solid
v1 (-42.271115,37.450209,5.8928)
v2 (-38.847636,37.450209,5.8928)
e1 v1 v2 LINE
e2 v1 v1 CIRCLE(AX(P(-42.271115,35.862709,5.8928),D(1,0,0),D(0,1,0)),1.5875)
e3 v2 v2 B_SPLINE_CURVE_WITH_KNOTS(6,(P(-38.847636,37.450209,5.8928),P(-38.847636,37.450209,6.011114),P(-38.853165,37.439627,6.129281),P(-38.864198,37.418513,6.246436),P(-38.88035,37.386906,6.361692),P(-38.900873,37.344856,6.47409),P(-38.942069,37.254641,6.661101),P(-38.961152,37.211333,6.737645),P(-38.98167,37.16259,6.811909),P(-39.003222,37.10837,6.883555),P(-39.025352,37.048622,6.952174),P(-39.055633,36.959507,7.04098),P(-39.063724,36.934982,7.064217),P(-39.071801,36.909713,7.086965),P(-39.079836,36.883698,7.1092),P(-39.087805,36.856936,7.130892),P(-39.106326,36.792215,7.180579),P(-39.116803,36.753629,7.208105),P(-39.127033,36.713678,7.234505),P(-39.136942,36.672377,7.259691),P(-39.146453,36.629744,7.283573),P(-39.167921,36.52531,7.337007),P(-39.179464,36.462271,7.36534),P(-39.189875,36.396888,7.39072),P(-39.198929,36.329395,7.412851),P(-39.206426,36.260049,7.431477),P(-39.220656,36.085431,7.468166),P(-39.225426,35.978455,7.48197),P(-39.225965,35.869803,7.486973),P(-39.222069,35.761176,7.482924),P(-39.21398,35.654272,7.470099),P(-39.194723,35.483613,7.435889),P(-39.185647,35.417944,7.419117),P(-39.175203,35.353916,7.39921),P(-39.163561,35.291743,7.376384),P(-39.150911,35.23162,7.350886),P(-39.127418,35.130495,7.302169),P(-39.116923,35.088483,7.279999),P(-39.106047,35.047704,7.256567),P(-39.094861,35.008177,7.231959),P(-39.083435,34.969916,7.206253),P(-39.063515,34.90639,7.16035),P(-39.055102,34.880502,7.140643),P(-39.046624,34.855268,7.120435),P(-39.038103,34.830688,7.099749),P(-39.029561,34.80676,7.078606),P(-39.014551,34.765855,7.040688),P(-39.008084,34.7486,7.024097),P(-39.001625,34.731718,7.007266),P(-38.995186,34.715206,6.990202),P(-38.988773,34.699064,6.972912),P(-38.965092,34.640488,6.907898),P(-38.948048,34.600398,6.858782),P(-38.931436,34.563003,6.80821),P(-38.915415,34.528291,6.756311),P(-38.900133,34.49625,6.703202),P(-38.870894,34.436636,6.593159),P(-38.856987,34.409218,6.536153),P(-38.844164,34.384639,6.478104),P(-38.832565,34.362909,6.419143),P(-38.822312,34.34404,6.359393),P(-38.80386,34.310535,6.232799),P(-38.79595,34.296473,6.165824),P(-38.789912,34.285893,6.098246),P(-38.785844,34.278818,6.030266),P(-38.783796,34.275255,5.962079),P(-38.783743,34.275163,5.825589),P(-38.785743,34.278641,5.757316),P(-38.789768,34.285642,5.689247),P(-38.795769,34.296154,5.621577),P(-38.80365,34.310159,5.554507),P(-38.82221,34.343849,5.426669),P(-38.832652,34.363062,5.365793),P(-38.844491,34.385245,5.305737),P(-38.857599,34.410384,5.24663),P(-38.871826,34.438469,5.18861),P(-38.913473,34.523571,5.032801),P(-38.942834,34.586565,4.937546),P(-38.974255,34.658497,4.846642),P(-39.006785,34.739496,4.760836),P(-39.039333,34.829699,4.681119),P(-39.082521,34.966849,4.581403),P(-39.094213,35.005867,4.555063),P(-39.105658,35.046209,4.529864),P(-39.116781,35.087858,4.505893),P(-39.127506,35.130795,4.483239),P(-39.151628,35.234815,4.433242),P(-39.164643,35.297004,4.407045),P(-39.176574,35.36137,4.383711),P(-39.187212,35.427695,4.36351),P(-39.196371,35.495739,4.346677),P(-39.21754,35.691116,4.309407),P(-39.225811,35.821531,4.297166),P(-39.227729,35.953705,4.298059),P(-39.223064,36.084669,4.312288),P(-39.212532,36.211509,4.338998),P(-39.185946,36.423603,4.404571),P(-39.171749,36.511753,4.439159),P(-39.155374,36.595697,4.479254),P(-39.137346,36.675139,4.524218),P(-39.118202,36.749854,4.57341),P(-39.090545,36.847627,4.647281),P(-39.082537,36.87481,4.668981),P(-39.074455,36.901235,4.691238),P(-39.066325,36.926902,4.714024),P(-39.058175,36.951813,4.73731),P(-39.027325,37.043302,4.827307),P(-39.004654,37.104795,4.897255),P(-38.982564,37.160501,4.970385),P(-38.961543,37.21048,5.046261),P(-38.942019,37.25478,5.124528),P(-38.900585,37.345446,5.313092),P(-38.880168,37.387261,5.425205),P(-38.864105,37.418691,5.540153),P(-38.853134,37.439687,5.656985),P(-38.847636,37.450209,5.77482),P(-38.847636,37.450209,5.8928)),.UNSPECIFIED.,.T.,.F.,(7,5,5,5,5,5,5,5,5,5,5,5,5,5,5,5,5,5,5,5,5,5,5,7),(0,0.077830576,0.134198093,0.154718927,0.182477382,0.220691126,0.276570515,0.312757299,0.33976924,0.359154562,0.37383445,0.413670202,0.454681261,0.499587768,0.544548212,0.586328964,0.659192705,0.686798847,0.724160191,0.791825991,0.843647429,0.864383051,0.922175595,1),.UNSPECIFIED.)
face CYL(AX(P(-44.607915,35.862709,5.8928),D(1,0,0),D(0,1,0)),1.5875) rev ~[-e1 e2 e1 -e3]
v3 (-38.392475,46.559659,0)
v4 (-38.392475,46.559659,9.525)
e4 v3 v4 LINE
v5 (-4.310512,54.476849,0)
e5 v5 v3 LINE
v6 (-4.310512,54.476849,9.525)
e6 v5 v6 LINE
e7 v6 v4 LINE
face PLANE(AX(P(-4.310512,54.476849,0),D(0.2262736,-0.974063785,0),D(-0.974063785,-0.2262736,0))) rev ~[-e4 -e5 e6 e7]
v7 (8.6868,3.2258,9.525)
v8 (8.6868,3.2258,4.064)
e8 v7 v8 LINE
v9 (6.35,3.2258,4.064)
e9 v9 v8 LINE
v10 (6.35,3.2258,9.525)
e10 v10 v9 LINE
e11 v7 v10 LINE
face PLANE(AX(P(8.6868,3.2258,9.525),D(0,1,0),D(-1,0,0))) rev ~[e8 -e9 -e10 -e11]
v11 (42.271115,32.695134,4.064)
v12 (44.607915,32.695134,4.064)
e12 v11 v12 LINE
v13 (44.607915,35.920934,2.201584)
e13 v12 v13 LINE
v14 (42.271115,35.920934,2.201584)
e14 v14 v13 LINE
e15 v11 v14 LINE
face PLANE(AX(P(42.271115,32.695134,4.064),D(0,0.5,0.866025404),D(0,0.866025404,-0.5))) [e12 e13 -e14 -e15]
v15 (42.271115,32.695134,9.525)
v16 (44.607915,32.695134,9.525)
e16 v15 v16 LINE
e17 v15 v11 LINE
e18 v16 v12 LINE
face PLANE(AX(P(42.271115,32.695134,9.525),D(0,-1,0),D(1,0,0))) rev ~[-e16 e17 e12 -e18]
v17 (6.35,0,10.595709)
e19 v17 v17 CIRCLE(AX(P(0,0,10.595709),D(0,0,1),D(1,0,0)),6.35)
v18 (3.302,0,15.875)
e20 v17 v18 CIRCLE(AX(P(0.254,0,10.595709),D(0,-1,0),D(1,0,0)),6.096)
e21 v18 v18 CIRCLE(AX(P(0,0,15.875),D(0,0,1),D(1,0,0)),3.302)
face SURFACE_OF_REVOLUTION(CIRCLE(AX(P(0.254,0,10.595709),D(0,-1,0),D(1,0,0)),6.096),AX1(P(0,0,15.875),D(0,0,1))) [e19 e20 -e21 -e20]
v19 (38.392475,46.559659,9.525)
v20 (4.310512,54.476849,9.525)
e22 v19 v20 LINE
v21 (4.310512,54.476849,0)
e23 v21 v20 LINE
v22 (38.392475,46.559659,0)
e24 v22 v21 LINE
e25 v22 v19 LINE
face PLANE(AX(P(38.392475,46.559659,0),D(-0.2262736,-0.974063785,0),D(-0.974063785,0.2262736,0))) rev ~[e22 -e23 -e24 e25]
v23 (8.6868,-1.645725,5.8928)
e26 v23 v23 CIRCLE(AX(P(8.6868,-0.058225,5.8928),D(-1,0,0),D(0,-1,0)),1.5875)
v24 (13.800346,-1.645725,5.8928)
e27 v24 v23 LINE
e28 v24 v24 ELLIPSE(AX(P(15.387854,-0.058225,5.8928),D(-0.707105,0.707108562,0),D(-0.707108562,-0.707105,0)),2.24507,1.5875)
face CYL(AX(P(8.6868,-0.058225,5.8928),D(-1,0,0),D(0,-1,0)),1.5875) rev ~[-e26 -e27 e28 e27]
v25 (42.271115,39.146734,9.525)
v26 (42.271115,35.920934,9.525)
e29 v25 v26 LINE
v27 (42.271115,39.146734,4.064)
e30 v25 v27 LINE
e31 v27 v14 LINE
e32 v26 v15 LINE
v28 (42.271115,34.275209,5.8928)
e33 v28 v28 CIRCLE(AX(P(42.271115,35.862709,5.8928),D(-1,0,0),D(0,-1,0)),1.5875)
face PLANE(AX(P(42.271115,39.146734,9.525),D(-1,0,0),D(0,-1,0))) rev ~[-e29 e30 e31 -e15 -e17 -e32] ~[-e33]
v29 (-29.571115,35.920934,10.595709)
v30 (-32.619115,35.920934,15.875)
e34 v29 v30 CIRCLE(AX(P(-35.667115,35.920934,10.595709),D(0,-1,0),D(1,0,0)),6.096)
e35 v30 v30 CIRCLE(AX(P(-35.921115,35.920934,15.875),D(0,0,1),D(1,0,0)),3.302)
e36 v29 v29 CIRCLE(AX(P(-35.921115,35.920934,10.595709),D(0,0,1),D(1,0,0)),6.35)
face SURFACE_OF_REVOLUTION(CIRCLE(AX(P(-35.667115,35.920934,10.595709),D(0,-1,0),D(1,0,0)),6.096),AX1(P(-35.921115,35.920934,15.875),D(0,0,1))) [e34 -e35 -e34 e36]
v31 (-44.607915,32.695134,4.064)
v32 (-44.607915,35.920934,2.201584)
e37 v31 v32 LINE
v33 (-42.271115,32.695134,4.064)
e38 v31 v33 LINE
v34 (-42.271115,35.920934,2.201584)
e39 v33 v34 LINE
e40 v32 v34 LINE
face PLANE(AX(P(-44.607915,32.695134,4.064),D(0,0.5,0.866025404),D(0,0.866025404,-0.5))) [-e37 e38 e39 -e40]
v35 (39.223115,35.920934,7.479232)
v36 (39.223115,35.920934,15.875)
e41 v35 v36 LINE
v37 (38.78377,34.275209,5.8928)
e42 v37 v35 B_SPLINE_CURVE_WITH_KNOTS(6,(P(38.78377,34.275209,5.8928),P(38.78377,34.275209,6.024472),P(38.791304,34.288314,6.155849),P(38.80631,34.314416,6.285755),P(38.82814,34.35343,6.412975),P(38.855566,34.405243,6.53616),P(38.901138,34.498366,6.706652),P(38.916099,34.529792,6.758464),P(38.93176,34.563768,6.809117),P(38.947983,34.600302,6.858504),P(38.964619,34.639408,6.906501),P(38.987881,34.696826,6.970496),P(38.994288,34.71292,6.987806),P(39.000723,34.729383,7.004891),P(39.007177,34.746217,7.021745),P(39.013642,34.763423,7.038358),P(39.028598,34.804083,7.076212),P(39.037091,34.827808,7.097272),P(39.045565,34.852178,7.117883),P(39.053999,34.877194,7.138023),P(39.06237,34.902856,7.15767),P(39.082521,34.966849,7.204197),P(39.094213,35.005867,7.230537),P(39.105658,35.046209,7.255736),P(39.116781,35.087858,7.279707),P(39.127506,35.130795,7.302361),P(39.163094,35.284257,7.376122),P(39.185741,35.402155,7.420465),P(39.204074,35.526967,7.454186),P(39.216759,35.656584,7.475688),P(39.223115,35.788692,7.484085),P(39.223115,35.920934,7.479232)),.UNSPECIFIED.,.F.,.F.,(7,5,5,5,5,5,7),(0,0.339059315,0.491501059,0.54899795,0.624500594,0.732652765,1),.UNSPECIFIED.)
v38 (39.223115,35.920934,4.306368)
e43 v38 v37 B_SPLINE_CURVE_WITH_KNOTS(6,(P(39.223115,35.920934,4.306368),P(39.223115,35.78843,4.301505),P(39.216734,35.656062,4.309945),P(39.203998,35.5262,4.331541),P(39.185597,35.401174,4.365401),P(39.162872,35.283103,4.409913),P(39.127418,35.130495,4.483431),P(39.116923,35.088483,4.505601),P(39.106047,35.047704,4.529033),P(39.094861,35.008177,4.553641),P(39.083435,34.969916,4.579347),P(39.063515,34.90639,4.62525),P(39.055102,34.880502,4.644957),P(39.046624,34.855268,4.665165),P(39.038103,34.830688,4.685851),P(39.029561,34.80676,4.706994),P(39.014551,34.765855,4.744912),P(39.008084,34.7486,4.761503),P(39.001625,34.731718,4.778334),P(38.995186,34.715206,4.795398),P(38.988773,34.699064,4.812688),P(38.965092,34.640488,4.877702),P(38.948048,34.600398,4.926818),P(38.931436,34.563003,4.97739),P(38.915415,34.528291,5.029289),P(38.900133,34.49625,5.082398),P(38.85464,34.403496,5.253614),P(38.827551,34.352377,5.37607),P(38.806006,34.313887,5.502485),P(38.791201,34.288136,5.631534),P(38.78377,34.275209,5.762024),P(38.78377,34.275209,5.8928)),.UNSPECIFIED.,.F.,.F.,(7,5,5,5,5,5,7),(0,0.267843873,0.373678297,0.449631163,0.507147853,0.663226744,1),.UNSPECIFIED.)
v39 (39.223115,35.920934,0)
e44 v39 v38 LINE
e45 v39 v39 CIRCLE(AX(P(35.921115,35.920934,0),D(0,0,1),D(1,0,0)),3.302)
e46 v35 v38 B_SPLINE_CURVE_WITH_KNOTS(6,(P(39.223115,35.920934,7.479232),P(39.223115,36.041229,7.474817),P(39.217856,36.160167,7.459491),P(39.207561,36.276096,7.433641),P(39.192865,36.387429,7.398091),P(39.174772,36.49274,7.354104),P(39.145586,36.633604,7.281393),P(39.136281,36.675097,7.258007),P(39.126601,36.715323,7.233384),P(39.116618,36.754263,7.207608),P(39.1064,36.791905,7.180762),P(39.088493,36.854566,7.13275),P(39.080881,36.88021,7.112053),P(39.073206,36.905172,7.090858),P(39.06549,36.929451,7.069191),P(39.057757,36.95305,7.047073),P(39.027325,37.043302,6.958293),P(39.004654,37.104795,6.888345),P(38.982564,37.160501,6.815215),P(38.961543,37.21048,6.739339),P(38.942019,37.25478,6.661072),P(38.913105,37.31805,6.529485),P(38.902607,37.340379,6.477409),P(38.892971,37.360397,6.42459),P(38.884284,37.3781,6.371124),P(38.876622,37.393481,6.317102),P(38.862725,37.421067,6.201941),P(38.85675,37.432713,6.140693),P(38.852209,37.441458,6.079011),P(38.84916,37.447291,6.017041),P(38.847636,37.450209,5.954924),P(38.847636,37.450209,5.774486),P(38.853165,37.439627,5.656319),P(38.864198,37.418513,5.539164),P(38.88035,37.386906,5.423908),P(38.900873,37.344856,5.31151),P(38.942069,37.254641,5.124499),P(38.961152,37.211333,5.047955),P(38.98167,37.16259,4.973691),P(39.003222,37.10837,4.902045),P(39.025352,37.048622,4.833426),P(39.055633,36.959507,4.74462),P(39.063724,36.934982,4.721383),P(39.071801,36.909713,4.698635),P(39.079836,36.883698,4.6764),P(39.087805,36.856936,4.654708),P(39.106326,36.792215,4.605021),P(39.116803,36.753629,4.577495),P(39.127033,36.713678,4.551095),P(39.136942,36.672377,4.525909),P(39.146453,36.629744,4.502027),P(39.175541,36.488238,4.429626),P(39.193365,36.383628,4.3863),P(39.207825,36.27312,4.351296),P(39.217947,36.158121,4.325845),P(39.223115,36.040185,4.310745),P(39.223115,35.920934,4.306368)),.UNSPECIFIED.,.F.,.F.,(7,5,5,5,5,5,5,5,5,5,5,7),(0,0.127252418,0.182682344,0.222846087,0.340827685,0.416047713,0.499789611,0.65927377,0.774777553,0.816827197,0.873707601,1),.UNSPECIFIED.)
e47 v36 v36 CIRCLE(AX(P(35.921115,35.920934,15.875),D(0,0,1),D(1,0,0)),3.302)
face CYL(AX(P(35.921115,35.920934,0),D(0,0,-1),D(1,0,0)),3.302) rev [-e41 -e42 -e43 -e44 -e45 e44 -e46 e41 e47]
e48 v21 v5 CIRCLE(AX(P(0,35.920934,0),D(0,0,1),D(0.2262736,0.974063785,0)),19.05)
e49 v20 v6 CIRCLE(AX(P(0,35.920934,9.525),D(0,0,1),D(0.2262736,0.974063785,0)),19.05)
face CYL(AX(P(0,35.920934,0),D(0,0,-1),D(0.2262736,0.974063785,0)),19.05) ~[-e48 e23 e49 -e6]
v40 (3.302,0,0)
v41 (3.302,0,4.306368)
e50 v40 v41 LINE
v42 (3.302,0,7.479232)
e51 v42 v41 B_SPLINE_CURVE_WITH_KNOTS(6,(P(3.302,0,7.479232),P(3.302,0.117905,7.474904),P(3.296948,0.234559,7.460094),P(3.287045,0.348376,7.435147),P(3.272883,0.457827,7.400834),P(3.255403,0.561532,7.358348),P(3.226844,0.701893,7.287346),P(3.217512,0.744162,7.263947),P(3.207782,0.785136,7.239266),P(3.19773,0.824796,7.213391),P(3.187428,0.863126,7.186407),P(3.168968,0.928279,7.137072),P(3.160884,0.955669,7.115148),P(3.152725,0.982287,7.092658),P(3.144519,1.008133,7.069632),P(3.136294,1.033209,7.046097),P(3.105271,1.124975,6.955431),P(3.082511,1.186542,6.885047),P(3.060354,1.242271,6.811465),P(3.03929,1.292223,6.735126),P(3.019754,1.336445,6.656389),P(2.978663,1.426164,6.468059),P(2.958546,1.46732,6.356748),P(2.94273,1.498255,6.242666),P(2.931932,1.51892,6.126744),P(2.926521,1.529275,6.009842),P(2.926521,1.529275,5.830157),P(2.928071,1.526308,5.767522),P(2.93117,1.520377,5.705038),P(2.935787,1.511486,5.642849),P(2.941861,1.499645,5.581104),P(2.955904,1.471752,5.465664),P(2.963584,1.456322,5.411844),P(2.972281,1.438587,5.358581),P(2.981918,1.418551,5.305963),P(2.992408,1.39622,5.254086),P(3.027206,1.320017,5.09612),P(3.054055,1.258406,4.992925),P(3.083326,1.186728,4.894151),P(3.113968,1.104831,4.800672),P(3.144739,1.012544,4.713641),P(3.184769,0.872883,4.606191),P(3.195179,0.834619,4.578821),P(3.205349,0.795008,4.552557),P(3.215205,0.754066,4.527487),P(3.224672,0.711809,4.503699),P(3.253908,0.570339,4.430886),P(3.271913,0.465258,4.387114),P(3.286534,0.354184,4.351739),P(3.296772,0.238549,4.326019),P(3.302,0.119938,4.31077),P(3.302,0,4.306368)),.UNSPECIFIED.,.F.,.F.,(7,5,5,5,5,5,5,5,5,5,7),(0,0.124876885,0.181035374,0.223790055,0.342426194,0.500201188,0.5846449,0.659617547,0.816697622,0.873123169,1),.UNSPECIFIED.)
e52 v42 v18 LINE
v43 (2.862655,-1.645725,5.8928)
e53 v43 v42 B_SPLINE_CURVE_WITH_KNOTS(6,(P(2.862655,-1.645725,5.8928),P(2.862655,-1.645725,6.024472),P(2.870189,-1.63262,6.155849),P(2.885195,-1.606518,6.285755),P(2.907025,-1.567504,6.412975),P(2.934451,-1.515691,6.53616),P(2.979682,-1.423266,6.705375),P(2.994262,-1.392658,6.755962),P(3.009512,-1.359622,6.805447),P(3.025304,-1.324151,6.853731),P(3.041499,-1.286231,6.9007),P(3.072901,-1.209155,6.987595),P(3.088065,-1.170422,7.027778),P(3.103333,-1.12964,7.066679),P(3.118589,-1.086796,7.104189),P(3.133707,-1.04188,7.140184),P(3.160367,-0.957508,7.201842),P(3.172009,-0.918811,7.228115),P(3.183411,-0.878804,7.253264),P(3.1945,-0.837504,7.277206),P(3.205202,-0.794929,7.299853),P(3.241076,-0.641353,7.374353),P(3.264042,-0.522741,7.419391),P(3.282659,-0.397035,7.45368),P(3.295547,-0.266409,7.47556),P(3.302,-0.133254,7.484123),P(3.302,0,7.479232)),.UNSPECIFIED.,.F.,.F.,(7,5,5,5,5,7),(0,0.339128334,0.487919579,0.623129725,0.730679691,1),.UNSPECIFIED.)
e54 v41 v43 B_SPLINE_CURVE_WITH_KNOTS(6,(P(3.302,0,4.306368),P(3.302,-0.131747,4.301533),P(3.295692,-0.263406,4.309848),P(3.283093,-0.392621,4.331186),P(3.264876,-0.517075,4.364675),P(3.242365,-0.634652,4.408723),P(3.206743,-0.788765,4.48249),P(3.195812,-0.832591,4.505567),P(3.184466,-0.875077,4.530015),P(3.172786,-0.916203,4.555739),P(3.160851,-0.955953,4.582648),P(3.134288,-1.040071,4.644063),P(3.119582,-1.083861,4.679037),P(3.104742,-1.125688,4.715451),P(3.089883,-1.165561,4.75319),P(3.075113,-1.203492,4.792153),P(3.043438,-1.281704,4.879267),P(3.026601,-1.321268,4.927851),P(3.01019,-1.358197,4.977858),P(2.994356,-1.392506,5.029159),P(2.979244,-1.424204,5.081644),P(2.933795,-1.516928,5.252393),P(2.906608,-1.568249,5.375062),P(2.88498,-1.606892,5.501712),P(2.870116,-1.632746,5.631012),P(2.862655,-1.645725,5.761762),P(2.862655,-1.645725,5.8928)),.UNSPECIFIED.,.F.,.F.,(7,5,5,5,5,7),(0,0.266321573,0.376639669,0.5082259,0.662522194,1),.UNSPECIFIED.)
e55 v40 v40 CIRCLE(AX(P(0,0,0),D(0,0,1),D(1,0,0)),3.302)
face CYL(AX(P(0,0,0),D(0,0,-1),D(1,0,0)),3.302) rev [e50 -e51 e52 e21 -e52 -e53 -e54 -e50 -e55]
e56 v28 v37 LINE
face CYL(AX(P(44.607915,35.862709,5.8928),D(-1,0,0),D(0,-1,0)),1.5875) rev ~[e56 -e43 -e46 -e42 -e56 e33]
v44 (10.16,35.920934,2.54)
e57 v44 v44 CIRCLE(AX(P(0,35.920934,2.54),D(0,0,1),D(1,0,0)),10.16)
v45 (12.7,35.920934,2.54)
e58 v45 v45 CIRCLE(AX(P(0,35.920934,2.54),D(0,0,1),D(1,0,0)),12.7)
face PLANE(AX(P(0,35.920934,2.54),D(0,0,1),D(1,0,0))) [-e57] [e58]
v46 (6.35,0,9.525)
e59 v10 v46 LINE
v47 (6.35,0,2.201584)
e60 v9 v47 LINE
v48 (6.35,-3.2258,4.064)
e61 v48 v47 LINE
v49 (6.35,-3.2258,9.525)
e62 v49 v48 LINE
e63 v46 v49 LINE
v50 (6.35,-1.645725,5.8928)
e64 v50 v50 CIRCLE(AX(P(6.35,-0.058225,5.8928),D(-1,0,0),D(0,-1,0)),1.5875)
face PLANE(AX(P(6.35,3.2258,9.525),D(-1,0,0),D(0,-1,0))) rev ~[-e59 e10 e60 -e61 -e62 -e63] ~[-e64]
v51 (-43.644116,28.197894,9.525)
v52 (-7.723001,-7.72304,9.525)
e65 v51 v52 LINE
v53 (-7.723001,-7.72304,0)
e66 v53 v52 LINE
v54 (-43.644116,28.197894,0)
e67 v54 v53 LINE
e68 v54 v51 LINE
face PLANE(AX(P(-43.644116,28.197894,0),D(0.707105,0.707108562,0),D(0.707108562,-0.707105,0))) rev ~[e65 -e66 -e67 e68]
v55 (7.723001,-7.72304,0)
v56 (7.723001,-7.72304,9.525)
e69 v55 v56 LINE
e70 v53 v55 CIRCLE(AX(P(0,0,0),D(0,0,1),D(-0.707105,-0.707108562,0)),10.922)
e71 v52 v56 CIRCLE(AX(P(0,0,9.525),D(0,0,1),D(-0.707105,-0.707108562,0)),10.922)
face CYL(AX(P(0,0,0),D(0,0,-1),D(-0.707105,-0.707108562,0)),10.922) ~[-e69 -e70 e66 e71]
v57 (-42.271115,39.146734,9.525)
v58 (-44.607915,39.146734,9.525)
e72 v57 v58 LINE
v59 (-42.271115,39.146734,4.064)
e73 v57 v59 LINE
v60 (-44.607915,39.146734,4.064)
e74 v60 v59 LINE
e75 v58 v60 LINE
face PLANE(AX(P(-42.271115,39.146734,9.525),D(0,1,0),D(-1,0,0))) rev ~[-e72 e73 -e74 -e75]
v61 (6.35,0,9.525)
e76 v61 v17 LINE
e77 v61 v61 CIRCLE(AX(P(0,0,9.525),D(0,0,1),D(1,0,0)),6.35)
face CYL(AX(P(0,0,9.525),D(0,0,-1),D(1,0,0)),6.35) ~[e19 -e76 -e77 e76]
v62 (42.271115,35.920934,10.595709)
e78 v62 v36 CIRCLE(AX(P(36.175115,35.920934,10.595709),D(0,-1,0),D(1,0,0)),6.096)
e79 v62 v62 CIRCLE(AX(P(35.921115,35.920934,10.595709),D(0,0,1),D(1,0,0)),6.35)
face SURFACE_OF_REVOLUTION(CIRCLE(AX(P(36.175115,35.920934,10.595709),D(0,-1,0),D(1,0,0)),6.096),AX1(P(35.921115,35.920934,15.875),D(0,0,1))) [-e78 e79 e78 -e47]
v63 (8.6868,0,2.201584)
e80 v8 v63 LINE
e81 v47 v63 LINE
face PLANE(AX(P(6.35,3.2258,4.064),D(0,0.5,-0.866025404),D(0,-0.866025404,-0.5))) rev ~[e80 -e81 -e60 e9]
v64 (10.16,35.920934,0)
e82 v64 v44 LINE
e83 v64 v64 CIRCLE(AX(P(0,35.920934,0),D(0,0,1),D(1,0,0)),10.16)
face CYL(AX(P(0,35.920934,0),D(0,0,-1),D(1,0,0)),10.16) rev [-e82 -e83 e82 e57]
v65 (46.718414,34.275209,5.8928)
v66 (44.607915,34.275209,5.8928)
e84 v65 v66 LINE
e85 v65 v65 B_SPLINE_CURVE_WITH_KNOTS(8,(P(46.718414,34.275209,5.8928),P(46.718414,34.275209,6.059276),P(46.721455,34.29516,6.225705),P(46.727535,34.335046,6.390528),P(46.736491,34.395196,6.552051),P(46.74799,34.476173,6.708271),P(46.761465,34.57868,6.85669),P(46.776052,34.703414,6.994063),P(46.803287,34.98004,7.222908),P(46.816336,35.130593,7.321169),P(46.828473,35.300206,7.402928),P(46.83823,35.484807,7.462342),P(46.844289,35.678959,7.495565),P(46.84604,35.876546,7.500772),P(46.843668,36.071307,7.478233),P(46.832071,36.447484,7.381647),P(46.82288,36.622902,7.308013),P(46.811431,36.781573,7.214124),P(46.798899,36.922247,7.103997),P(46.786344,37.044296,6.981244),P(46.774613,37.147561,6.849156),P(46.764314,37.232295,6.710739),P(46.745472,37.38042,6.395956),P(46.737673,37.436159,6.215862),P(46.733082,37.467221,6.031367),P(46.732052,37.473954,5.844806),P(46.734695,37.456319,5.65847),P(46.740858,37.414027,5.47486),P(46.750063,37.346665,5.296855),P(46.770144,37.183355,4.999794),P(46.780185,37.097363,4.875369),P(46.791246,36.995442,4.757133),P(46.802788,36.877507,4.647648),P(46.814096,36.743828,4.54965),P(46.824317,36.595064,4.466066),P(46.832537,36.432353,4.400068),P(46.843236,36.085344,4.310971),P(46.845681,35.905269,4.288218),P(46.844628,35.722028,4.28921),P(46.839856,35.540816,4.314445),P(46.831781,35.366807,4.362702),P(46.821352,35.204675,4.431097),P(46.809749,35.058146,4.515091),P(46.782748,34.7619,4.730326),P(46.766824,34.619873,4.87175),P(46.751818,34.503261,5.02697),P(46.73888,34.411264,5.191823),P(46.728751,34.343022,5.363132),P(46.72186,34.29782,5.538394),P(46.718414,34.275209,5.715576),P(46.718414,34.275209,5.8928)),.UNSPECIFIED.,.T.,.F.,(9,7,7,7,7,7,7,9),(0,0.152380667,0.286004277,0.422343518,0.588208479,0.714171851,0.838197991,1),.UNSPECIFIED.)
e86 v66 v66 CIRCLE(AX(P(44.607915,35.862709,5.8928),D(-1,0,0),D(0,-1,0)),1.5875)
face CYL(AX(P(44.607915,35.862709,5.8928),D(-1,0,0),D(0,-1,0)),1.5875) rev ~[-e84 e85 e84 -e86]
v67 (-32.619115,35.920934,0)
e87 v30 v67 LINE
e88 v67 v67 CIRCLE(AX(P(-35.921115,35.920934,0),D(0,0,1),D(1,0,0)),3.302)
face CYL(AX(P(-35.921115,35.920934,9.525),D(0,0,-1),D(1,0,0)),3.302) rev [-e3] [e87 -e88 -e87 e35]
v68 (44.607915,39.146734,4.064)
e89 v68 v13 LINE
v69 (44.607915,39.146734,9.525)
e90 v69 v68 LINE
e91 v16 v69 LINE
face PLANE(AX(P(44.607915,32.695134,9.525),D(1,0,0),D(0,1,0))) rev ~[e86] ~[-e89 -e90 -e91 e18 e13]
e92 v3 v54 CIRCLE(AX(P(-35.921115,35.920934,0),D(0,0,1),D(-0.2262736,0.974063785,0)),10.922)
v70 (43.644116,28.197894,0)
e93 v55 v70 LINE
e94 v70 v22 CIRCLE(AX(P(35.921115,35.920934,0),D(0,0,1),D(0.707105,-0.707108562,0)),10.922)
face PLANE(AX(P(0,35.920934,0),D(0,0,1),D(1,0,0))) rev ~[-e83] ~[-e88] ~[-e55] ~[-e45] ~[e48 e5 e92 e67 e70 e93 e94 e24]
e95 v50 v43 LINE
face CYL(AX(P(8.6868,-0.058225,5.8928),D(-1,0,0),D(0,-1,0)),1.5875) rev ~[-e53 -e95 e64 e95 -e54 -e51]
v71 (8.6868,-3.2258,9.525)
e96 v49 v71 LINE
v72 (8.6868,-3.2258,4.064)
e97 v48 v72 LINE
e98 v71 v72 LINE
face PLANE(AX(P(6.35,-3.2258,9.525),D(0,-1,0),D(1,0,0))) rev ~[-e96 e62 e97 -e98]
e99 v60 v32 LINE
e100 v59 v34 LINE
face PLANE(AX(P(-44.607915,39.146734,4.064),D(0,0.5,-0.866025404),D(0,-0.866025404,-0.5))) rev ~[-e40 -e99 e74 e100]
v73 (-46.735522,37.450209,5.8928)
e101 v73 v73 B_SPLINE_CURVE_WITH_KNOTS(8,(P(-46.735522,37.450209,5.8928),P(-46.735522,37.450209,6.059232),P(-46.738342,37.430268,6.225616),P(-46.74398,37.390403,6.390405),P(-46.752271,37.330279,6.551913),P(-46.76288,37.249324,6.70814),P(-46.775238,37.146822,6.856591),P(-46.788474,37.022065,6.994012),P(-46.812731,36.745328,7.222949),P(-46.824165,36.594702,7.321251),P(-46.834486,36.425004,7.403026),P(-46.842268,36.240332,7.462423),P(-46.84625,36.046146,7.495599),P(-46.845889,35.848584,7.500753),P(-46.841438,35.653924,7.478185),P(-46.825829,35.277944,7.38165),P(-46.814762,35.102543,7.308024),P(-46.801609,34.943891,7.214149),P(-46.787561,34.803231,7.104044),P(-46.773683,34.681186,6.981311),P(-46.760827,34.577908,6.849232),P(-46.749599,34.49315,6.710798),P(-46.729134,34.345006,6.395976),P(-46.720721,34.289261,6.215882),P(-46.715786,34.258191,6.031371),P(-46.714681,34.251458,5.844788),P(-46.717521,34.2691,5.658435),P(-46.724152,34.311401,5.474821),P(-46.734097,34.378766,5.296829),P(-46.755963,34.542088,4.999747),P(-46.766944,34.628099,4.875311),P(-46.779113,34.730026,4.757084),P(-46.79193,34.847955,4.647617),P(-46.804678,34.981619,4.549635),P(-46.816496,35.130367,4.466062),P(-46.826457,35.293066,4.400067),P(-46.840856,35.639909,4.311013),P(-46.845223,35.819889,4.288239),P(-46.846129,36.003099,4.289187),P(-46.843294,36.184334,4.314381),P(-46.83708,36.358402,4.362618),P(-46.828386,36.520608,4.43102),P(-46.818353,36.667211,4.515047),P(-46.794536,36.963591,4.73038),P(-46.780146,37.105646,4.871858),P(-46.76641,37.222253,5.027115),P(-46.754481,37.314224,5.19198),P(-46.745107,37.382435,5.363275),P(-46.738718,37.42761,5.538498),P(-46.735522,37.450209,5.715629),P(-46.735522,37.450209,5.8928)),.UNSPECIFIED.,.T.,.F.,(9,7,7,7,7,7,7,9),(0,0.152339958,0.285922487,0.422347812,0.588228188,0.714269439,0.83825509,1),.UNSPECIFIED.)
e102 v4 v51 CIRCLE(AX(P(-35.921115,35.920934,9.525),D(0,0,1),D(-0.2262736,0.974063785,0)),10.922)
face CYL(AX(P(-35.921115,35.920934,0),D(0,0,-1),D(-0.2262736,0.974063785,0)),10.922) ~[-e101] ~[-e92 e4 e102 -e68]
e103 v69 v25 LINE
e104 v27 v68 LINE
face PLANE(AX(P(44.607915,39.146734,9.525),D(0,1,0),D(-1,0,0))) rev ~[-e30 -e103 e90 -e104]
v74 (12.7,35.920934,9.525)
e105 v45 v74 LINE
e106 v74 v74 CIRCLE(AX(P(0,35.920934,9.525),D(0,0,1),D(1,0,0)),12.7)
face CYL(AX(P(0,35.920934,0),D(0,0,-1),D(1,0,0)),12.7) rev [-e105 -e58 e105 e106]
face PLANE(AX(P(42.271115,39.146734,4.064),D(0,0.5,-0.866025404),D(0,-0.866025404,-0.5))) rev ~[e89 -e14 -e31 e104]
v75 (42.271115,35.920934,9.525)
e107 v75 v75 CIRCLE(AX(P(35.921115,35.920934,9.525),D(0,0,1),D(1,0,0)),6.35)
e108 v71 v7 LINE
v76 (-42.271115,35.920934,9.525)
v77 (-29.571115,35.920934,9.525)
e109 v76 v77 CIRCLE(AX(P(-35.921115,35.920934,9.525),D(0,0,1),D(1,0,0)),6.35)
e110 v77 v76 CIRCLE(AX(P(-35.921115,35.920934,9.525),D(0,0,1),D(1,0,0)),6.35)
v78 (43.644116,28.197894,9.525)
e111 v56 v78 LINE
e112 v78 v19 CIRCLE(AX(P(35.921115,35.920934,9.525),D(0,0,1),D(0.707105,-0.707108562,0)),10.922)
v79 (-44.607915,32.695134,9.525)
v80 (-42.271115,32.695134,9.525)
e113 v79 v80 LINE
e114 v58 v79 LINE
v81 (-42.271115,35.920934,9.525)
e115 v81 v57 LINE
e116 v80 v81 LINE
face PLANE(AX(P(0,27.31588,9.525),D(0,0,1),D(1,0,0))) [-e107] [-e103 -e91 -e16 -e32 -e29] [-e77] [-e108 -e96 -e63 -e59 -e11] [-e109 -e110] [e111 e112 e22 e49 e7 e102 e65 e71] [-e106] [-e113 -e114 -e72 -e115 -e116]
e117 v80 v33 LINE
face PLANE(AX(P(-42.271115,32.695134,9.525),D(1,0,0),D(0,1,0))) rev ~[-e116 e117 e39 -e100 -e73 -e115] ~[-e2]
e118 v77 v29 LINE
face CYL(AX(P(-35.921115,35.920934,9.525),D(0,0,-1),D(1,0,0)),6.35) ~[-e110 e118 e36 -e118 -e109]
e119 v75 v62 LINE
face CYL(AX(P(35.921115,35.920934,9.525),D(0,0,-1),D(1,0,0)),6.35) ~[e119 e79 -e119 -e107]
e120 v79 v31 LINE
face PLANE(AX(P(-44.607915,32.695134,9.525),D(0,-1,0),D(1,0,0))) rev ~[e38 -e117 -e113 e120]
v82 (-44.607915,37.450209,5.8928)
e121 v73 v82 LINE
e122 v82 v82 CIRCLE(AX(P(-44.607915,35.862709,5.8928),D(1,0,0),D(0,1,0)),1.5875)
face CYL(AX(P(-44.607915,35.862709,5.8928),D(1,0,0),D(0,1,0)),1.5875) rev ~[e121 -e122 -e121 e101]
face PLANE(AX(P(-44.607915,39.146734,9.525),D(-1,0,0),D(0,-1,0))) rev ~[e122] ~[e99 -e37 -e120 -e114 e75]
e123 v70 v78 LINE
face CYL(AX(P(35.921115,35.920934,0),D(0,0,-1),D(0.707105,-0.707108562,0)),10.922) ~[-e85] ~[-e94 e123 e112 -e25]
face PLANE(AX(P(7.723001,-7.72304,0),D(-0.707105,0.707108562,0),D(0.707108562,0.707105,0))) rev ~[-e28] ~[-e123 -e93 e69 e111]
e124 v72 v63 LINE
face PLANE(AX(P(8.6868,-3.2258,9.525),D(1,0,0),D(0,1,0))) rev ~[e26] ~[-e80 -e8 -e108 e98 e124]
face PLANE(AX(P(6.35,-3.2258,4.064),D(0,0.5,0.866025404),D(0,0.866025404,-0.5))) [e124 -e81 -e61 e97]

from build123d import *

# Parameters (mm, degrees)
F0_R        = 3.302
F0_R_2      = 12.7
F1_DEPTH    = 9.525
F0_R_3      = 10.16
F2_DEPTH    = 2.54
F5_DEPTH    = 8.636
F6_T1_DEPTH = 2.3368
F6_T3_DEPTH = 2.3368
F6_T5_DEPTH = 2.3368
F3_R        = 6.35
F3_R_2      = 3.302
F7_DEPTH    = 6.35
F11_R       = 1.5875
F12_DEPTH   = 6.35
F9_R        = 1.5875
F13_DEPTH   = 6.35
F10_R       = 1.5875
F14_DEPTH   = 8.382


# Not quite as in the source:
# - a fillet or chamfer that OpenCascade refuses, or shapes differently, is made with other operations: its cross-section is extruded or revolved along the edge and cut away or added
# - a feature names something its author has since deleted; it is built from what else it names


with BuildPart() as f1:
    # F0 (on Top) → F1 (new body)
    with BuildSketch(Plane.XY):
        with BuildLine():
            Line((38.3924752276, 46.5596586637), (4.3105120801, 54.476849111))
            ThreePointArc((4.3105120801, 54.476849111), (0, 54.970934), (-4.3105120801, 54.476849111))
            Line((-4.3105120801, 54.476849111), (-38.3924752276, 46.5596586637))
            ThreePointArc((-38.3924752276, 46.5596586637), (-46.4220600308, 38.9243049052), (-43.6441157783, 28.1978942818))
            Line((-43.6441157783, 28.1978942818), (-7.72300081, -7.7230397182))
            ThreePointArc((-7.72300081, -7.7230397182), (0, -10.922), (7.72300081, -7.7230397182))
            Line((7.72300081, -7.7230397182), (43.6441157783, 28.1978942818))
            ThreePointArc((43.6441157783, 28.1978942818), (46.4220600308, 38.9243049052), (38.3924752276, 46.5596586637))
        make_face()
        Circle(F0_R, mode=Mode.SUBTRACT)
        with Locations((-35.9211149683, 35.920934)):
            Circle(F0_R, mode=Mode.SUBTRACT)
        with Locations((0, 35.920934)):
            Circle(F0_R_2, mode=Mode.SUBTRACT)
        with Locations((35.9211149683, 35.920934)):
            Circle(F0_R, mode=Mode.SUBTRACT)
    extrude(amount=F1_DEPTH)

    # F0 (on Top) → F2 (join)
    with BuildSketch(Plane.XY):
        with Locations((0, 35.920934)):
            Circle(F0_R_2)
        with Locations((0, 35.920934)):
            Circle(F0_R_3, mode=Mode.SUBTRACT)
    extrude(amount=F2_DEPTH)

    # F4 (on face) → F5 (cut)
    with BuildSketch(Plane.XY.offset(9.525)):
        Polygon((-42.2711149683, 32.695134), (-42.2711149683, 35.920934), (-42.2711149683, 39.146734), (-44.6079149683, 39.146734), (-44.6079149683, 32.695134), align=None)
        Polygon((42.2711149683, 39.146734), (42.2711149683, 35.920934), (42.2711149683, 32.695134), (44.6079149683, 32.695134), (44.6079149683, 39.146734), align=None)
        Polygon((6.35, 3.2258), (6.35, 0), (6.35, -3.2258), (8.6868, -3.2258), (8.6868, 3.2258), align=None)
    extrude(amount=-F5_DEPTH, mode=Mode.SUBTRACT)

    # F6: chamfer of 3.175 x 5.499261314 on 6 edges, made by hand

    # F6_s2 → F6_t1 (join)
    with BuildSketch(Plane.YZ.offset(-44.6079149683)):
        Polygon((39.146734, 4.064), (33.647472686, 0.889), (39.146734, 0.889), align=None)
        Polygon((32.695134, 4.064), (38.194395314, 0.889), (32.695134, 0.889), align=None)
    extrude(amount=F6_T1_DEPTH)

    # F6_s4 → F6_t3 (join)
    with BuildSketch(Plane.YZ.offset(6.35)):
        Polygon((3.2258, 4.064), (-2.273461314, 0.889), (3.2258, 0.889), align=None)
        Polygon((-3.2258, 4.064), (2.273461314, 0.889), (-3.2258, 0.889), align=None)
    extrude(amount=F6_T3_DEPTH)

    # F6_s6 → F6_t5 (join)
    with BuildSketch(Plane.YZ.offset(42.2711149683)):
        Polygon((39.146734, 4.064), (33.647472686, 0.889), (39.146734, 0.889), align=None)
        Polygon((32.695134, 4.064), (38.194395314, 0.889), (32.695134, 0.889), align=None)
    extrude(amount=F6_T5_DEPTH)

    # F3 (on face) → F7 (join)
    with BuildSketch(Plane.XY.offset(9.525)):
        with Locations((-35.9211149683, 35.920934)):
            Circle(F3_R)
        with Locations((-35.9211149683, 35.920934)):
            Circle(F3_R_2, mode=Mode.SUBTRACT)
        Circle(F3_R)
        Circle(F3_R_2, mode=Mode.SUBTRACT)
        with Locations((35.9211149683, 35.920934)):
            Circle(F3_R)
        with Locations((35.9211149683, 35.920934)):
            Circle(F3_R_2, mode=Mode.SUBTRACT)
    extrude(amount=F7_DEPTH)

    # F8: fillet of radius 6.096 on 3 edges, made by hand

    # F8_s1 → F8_t2 (revolve, cut)
    with BuildSketch(Plane.XZ.offset(-35.920934)):
        with BuildLine():
            ThreePointArc((-29.5711149683, 10.5957091385), (-30.3878241069, 13.6437091385), (-32.6191149683, 15.875))
            Line((-32.6191149683, 15.875), (-29.5711149683, 15.875))
            Line((-29.5711149683, 15.875), (-29.5711149683, 10.5957091385))
        make_face()
    revolve(axis=Axis((-35.9211149683, 35.920934, 15.875), (0, 0, 1)), mode=Mode.SUBTRACT)

    # F8_s3 → F8_t4 (revolve, cut)
    with BuildSketch(Plane.XZ.offset(-35.920934)):
        with BuildLine():
            ThreePointArc((42.2711149683, 10.5957091385), (41.4544058298, 13.6437091385), (39.2231149683, 15.875))
            Line((39.2231149683, 15.875), (42.2711149683, 15.875))
            Line((42.2711149683, 15.875), (42.2711149683, 10.5957091385))
        make_face()
    revolve(axis=Axis((35.9211149683, 35.920934, 15.875), (0, 0, 1)), mode=Mode.SUBTRACT)

    # F8_s5 → F8_t6 (revolve, cut)
    with BuildSketch(Plane.XZ):
        with BuildLine():
            ThreePointArc((6.35, 10.5957091385), (5.5332908615, 13.6437091385), (3.302, 15.875))
            Line((3.302, 15.875), (6.35, 15.875))
            Line((6.35, 15.875), (6.35, 10.5957091385))
        make_face()
    revolve(axis=Axis((0, 0, 15.875), (0, 0, 1)), mode=Mode.SUBTRACT)

    # F11 (on face) → F12 (cut, symmetric)
    with BuildSketch(Plane(origin=(44.6079149683, 0, 0), x_dir=(0, -1, 0), z_dir=(-1, 0, 0))):
        with Locations((-35.8627085169, 5.8928)):
            Circle(F11_R)
    extrude(amount=F12_DEPTH, both=True, mode=Mode.SUBTRACT)

    # F9 (on face) → F13 (cut, symmetric)
    with BuildSketch(Plane.YZ.offset(-44.6079149683)):
        with Locations((35.8627085169, 5.8928)):
            Circle(F9_R)
    extrude(amount=F13_DEPTH, both=True, mode=Mode.SUBTRACT)

    # F10 (on face) → F14 (cut, symmetric)
    with BuildSketch(Plane(origin=(8.6868, 0, 0), x_dir=(0, -1, 0), z_dir=(-1, 0, 0))):
        with Locations((0.0582254831, 5.8928)):
            Circle(F10_R)
    extrude(amount=F14_DEPTH, both=True, mode=Mode.SUBTRACT)


solid = f1.part
